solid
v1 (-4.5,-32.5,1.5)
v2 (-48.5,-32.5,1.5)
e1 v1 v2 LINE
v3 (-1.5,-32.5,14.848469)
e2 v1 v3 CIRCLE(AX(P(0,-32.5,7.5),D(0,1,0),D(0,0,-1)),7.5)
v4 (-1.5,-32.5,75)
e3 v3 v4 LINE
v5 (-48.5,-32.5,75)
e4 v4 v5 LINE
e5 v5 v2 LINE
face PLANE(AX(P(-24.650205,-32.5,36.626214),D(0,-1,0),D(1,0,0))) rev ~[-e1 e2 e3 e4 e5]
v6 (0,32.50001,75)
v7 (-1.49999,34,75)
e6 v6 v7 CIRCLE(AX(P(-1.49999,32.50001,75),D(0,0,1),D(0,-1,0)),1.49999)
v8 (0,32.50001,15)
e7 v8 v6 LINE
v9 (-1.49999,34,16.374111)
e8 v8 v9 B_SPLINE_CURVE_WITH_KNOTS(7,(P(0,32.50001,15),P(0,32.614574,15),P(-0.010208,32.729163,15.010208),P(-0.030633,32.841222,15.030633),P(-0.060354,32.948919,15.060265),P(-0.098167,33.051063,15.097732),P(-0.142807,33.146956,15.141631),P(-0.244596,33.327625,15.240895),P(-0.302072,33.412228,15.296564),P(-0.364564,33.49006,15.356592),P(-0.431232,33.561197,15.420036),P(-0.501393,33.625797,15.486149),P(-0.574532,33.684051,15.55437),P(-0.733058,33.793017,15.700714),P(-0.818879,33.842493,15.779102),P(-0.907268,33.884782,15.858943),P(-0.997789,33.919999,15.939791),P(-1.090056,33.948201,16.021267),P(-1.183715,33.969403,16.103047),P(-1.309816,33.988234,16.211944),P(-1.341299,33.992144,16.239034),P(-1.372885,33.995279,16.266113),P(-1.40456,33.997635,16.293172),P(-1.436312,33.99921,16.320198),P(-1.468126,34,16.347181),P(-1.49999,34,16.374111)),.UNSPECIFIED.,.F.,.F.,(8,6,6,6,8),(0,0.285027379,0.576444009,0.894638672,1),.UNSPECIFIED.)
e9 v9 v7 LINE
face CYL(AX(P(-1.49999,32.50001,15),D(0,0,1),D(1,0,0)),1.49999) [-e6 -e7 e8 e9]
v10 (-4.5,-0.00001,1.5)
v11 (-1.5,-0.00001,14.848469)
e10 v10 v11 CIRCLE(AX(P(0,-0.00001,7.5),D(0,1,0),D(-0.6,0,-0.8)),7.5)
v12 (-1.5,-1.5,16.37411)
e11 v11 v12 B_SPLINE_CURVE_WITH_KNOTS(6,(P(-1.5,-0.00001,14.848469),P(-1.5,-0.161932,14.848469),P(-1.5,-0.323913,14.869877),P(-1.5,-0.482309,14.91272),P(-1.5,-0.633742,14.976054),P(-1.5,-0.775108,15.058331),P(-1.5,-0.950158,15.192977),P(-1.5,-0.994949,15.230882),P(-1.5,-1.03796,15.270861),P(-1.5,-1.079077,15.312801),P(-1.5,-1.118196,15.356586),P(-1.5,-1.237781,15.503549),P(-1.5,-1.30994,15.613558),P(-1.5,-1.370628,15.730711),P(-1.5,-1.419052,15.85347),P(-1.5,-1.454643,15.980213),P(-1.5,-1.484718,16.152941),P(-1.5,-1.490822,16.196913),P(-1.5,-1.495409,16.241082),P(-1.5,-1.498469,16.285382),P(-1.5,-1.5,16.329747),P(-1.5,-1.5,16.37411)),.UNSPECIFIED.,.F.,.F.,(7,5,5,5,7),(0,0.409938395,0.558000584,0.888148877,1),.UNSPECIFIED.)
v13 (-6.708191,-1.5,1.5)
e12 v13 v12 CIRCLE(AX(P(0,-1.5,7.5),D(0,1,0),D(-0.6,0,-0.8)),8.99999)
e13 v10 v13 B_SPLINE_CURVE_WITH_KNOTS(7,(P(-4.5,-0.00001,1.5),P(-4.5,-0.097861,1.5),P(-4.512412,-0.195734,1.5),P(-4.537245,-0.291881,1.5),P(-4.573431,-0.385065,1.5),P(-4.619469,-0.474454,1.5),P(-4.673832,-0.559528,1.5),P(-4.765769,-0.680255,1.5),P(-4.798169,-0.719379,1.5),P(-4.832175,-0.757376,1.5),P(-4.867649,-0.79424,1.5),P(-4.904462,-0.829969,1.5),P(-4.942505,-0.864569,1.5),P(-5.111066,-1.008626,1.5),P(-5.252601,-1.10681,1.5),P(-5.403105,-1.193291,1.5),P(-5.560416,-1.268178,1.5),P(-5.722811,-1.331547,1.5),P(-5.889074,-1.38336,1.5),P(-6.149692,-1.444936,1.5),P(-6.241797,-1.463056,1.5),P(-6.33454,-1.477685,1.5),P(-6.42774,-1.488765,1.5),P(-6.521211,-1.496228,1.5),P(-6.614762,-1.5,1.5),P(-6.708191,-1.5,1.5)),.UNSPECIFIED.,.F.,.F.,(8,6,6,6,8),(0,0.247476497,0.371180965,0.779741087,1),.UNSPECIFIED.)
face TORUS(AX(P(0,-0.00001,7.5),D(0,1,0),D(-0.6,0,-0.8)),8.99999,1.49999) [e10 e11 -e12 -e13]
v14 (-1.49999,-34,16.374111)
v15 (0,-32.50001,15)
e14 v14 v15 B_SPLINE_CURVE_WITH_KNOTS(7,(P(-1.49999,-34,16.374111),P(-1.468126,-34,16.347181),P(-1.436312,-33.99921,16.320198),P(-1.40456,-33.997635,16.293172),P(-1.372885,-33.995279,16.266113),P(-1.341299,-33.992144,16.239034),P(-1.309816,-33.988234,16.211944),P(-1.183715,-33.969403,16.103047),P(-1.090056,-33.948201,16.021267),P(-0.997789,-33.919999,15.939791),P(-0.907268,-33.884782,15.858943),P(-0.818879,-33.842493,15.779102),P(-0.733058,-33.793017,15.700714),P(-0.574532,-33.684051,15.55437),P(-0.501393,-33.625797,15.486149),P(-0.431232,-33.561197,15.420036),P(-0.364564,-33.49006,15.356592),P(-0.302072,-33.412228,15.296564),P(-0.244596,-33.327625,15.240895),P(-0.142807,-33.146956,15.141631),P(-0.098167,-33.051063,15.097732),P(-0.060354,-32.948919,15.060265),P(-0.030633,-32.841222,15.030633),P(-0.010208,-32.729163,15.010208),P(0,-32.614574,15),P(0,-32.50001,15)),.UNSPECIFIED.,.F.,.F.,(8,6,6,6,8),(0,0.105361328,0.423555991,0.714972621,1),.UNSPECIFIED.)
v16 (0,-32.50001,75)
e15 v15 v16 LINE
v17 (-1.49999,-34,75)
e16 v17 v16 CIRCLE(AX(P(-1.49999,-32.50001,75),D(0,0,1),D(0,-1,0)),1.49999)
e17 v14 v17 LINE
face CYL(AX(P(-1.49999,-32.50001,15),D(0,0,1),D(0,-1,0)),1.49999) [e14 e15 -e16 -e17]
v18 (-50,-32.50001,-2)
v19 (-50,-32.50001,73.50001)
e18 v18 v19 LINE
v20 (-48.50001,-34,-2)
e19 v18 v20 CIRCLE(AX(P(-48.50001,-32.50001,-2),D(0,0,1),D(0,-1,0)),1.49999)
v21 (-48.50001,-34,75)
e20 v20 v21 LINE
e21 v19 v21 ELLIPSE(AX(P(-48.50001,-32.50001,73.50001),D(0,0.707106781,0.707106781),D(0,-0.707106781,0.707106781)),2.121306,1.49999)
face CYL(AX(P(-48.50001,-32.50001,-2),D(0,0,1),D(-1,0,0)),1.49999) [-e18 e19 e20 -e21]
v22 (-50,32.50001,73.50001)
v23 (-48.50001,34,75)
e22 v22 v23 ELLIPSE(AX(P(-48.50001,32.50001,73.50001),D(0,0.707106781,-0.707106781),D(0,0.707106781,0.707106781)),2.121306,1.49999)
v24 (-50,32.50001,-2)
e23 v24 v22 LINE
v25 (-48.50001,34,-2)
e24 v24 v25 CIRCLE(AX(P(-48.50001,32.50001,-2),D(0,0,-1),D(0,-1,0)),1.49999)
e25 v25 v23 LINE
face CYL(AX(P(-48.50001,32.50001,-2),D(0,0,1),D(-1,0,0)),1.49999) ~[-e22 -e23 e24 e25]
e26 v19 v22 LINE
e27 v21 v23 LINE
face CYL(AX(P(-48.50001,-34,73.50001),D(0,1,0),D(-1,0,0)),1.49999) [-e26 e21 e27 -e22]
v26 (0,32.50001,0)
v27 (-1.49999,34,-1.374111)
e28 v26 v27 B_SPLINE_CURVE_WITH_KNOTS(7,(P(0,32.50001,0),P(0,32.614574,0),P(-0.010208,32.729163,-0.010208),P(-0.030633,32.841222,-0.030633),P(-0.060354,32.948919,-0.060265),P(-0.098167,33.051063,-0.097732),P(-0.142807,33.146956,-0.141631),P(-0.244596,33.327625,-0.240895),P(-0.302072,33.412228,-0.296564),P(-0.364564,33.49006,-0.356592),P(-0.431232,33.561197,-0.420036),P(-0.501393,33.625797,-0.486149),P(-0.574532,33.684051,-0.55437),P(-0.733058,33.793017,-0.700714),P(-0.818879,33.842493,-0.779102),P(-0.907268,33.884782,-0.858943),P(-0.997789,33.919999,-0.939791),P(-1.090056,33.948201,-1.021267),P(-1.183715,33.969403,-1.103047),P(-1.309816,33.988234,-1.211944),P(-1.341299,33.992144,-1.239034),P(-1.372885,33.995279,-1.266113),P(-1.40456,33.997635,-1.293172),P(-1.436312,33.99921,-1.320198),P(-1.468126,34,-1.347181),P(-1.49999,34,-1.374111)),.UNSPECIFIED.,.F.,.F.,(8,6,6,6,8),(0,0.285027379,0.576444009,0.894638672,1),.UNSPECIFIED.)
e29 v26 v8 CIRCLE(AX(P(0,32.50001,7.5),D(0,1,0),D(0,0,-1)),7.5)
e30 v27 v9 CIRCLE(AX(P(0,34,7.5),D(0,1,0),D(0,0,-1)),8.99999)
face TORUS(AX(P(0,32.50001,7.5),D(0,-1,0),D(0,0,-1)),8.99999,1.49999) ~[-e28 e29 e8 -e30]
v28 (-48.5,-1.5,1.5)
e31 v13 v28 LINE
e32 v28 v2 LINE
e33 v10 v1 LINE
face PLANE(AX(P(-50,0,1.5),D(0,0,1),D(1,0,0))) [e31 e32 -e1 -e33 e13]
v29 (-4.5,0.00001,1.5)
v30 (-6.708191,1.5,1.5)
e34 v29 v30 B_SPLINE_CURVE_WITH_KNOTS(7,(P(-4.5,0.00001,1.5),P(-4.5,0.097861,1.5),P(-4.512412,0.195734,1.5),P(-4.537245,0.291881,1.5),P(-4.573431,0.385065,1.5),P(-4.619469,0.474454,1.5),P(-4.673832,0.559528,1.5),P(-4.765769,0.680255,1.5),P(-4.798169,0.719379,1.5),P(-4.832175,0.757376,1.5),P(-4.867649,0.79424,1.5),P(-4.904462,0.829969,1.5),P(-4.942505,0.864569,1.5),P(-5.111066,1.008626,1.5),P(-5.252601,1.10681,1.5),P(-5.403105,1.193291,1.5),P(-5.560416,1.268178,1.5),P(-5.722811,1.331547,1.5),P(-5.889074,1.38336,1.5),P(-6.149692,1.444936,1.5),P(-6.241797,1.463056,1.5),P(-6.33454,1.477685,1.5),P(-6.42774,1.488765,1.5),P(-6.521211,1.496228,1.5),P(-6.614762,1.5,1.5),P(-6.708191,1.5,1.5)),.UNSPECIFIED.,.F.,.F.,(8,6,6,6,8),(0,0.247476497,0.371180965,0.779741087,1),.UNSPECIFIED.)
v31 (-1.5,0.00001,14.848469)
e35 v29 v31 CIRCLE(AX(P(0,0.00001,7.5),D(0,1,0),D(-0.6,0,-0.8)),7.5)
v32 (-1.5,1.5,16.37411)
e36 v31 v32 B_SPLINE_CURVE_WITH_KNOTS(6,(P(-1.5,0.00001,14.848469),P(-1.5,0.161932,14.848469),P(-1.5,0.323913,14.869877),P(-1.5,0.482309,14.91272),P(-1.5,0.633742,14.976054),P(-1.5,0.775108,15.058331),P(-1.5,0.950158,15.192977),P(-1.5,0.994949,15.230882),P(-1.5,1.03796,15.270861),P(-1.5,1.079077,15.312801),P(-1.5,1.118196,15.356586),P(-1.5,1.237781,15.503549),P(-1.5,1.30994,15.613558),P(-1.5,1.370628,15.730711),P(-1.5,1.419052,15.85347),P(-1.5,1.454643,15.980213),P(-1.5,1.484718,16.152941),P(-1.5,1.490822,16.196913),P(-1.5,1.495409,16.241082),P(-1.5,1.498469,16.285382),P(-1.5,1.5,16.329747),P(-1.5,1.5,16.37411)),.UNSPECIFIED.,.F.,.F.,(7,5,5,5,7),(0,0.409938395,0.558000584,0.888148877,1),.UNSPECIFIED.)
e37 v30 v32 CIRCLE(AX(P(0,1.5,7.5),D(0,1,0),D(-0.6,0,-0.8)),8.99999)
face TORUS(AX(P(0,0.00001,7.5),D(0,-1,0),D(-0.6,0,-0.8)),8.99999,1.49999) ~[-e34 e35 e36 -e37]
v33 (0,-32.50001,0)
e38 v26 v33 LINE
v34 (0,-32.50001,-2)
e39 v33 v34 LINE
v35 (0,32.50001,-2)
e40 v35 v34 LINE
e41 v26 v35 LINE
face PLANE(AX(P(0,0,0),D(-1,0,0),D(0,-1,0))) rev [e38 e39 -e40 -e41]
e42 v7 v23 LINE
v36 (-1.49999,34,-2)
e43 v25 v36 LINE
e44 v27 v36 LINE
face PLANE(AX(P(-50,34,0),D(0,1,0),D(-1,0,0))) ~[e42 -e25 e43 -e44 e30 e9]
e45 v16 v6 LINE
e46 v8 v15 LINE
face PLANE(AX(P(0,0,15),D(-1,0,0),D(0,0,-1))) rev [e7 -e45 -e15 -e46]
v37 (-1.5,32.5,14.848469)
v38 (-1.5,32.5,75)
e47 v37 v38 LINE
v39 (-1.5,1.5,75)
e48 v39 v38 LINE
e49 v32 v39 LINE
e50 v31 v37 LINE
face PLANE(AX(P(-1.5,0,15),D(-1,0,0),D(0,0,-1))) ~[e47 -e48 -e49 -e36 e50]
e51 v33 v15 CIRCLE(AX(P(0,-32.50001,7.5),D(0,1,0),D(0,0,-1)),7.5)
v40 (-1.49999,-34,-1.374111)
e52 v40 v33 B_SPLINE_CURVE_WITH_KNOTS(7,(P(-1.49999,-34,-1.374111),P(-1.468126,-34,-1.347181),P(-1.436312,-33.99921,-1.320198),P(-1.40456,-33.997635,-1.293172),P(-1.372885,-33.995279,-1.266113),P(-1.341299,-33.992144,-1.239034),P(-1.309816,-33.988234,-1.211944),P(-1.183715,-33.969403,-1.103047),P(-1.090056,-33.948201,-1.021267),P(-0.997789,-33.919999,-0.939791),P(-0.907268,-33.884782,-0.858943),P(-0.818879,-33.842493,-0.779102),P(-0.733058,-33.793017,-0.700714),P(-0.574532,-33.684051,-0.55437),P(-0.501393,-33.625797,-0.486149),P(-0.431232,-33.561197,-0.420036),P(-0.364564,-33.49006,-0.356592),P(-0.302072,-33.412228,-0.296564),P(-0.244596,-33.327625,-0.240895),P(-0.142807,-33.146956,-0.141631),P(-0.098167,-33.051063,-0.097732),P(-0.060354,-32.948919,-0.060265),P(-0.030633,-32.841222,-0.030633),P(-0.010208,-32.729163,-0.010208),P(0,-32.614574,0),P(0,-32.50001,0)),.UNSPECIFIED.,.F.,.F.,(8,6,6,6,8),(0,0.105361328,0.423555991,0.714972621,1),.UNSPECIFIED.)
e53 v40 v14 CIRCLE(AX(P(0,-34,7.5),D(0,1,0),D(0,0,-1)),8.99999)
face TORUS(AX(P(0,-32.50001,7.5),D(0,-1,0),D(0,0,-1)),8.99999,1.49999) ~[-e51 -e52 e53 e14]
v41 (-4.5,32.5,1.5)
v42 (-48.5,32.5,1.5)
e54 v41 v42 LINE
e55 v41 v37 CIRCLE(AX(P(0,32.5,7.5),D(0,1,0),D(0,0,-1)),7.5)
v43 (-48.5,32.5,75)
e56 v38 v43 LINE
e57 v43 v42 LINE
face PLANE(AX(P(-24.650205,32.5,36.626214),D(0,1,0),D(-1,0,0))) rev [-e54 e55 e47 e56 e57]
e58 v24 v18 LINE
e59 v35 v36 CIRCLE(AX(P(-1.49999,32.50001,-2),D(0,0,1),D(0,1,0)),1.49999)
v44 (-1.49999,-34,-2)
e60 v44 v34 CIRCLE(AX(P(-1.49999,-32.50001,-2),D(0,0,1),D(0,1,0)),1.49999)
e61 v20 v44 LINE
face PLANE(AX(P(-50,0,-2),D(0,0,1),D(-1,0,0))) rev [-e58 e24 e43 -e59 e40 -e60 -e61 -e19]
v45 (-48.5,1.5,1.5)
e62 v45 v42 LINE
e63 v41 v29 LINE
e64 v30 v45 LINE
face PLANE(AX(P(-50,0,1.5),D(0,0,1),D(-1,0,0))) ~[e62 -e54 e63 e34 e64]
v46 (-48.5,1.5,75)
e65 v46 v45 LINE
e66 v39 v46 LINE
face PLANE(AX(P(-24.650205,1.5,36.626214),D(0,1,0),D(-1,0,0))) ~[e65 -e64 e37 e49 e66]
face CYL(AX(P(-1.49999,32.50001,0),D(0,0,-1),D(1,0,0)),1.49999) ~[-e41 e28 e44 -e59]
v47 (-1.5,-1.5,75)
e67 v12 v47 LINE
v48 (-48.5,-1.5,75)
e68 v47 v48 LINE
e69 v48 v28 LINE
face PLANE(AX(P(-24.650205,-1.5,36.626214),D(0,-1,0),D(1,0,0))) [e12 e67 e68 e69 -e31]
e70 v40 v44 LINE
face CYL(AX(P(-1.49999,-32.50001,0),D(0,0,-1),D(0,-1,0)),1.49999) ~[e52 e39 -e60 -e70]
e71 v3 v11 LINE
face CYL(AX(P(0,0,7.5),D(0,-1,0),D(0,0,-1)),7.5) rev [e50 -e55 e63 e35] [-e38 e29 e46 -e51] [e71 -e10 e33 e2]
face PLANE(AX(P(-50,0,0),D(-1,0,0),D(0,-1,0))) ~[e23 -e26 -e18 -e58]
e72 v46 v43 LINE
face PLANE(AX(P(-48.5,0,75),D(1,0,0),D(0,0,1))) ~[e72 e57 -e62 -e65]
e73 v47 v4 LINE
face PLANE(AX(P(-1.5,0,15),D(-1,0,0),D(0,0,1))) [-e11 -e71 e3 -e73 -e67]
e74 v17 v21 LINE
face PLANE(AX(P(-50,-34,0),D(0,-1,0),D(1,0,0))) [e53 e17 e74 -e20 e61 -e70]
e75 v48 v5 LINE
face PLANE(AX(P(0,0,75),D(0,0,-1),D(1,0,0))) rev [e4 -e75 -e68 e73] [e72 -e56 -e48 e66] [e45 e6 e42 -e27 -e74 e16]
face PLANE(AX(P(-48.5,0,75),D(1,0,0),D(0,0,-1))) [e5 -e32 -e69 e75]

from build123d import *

# Parameters (mm, degrees)
F1_DEPTH = 34
F2_T     = -1.5
F3_DEPTH = 2
F6_R     = 1.49999


# Not quite as in the source:
# - a fillet or chamfer is up to 0.001 mm smaller than in the source, because OpenCascade refuses the exact size


with BuildPart() as f1:
    # F0 (on Front) → F1 (new body)
    with BuildSketch(Plane.XZ):
        with BuildLine():
            Line((0, 75), (-50, 75))
            Line((-50, 75), (-50, 0))
            Line((-50, 0), (0, 0))
            ThreePointArc((0, 0), (-7.5, 7.5), (0, 15))
            Line((0, 15), (0, 75))
        make_face()
    extrude(amount=F1_DEPTH)

    # F2
    f2_openings = [f1.faces().sort_by_distance(p)[0] for p in [
        (-25, -17, 75),
        (-7.5, -17, 7.5),
    ]]
    offset(amount=F2_T, openings=f2_openings)

    # F3 (add): a face of the model
    f3_faces = [f1.faces().sort_by_distance(p)[0] for p in [
        (-25, -17, 0),
    ]]
    extrude(f3_faces, amount=F3_DEPTH)


with BuildPart() as f4_1:
    # F4: instance of F1
    add(f1.part.mirror(Plane(origin=(-25.5124575843, 0, 37.1811815231), x_dir=(-1, 0, 0), z_dir=(0, 1, 0))))


with BuildPart() as f1_1:
    add(f1.part)

    # F5: union F4_1
    add(f4_1.part)

    # F6 (radius 1.5 in the source; OpenCascade refuses exactly that, so slightly less here)
    f6_edges = [f1_1.edges().sort_by_distance(p)[0] for p in [
        (0, -34, 45),
        (-50, -34, 36.5),
        (-50, 34, 36.5),
        (0, 34, -1),
        (0, -34, -1),
        (-50, 0, 75),
        (0, 34, 45),
        (-7.5, 34, 7.5),
        (-7.317473, 1.5, 9.144564),
        (-7.317473, -1.5, 9.144564),
        (-7.5, -34, 7.5),
    ]]
    fillet(f6_edges, radius=F6_R)


solid = f1_1.part
